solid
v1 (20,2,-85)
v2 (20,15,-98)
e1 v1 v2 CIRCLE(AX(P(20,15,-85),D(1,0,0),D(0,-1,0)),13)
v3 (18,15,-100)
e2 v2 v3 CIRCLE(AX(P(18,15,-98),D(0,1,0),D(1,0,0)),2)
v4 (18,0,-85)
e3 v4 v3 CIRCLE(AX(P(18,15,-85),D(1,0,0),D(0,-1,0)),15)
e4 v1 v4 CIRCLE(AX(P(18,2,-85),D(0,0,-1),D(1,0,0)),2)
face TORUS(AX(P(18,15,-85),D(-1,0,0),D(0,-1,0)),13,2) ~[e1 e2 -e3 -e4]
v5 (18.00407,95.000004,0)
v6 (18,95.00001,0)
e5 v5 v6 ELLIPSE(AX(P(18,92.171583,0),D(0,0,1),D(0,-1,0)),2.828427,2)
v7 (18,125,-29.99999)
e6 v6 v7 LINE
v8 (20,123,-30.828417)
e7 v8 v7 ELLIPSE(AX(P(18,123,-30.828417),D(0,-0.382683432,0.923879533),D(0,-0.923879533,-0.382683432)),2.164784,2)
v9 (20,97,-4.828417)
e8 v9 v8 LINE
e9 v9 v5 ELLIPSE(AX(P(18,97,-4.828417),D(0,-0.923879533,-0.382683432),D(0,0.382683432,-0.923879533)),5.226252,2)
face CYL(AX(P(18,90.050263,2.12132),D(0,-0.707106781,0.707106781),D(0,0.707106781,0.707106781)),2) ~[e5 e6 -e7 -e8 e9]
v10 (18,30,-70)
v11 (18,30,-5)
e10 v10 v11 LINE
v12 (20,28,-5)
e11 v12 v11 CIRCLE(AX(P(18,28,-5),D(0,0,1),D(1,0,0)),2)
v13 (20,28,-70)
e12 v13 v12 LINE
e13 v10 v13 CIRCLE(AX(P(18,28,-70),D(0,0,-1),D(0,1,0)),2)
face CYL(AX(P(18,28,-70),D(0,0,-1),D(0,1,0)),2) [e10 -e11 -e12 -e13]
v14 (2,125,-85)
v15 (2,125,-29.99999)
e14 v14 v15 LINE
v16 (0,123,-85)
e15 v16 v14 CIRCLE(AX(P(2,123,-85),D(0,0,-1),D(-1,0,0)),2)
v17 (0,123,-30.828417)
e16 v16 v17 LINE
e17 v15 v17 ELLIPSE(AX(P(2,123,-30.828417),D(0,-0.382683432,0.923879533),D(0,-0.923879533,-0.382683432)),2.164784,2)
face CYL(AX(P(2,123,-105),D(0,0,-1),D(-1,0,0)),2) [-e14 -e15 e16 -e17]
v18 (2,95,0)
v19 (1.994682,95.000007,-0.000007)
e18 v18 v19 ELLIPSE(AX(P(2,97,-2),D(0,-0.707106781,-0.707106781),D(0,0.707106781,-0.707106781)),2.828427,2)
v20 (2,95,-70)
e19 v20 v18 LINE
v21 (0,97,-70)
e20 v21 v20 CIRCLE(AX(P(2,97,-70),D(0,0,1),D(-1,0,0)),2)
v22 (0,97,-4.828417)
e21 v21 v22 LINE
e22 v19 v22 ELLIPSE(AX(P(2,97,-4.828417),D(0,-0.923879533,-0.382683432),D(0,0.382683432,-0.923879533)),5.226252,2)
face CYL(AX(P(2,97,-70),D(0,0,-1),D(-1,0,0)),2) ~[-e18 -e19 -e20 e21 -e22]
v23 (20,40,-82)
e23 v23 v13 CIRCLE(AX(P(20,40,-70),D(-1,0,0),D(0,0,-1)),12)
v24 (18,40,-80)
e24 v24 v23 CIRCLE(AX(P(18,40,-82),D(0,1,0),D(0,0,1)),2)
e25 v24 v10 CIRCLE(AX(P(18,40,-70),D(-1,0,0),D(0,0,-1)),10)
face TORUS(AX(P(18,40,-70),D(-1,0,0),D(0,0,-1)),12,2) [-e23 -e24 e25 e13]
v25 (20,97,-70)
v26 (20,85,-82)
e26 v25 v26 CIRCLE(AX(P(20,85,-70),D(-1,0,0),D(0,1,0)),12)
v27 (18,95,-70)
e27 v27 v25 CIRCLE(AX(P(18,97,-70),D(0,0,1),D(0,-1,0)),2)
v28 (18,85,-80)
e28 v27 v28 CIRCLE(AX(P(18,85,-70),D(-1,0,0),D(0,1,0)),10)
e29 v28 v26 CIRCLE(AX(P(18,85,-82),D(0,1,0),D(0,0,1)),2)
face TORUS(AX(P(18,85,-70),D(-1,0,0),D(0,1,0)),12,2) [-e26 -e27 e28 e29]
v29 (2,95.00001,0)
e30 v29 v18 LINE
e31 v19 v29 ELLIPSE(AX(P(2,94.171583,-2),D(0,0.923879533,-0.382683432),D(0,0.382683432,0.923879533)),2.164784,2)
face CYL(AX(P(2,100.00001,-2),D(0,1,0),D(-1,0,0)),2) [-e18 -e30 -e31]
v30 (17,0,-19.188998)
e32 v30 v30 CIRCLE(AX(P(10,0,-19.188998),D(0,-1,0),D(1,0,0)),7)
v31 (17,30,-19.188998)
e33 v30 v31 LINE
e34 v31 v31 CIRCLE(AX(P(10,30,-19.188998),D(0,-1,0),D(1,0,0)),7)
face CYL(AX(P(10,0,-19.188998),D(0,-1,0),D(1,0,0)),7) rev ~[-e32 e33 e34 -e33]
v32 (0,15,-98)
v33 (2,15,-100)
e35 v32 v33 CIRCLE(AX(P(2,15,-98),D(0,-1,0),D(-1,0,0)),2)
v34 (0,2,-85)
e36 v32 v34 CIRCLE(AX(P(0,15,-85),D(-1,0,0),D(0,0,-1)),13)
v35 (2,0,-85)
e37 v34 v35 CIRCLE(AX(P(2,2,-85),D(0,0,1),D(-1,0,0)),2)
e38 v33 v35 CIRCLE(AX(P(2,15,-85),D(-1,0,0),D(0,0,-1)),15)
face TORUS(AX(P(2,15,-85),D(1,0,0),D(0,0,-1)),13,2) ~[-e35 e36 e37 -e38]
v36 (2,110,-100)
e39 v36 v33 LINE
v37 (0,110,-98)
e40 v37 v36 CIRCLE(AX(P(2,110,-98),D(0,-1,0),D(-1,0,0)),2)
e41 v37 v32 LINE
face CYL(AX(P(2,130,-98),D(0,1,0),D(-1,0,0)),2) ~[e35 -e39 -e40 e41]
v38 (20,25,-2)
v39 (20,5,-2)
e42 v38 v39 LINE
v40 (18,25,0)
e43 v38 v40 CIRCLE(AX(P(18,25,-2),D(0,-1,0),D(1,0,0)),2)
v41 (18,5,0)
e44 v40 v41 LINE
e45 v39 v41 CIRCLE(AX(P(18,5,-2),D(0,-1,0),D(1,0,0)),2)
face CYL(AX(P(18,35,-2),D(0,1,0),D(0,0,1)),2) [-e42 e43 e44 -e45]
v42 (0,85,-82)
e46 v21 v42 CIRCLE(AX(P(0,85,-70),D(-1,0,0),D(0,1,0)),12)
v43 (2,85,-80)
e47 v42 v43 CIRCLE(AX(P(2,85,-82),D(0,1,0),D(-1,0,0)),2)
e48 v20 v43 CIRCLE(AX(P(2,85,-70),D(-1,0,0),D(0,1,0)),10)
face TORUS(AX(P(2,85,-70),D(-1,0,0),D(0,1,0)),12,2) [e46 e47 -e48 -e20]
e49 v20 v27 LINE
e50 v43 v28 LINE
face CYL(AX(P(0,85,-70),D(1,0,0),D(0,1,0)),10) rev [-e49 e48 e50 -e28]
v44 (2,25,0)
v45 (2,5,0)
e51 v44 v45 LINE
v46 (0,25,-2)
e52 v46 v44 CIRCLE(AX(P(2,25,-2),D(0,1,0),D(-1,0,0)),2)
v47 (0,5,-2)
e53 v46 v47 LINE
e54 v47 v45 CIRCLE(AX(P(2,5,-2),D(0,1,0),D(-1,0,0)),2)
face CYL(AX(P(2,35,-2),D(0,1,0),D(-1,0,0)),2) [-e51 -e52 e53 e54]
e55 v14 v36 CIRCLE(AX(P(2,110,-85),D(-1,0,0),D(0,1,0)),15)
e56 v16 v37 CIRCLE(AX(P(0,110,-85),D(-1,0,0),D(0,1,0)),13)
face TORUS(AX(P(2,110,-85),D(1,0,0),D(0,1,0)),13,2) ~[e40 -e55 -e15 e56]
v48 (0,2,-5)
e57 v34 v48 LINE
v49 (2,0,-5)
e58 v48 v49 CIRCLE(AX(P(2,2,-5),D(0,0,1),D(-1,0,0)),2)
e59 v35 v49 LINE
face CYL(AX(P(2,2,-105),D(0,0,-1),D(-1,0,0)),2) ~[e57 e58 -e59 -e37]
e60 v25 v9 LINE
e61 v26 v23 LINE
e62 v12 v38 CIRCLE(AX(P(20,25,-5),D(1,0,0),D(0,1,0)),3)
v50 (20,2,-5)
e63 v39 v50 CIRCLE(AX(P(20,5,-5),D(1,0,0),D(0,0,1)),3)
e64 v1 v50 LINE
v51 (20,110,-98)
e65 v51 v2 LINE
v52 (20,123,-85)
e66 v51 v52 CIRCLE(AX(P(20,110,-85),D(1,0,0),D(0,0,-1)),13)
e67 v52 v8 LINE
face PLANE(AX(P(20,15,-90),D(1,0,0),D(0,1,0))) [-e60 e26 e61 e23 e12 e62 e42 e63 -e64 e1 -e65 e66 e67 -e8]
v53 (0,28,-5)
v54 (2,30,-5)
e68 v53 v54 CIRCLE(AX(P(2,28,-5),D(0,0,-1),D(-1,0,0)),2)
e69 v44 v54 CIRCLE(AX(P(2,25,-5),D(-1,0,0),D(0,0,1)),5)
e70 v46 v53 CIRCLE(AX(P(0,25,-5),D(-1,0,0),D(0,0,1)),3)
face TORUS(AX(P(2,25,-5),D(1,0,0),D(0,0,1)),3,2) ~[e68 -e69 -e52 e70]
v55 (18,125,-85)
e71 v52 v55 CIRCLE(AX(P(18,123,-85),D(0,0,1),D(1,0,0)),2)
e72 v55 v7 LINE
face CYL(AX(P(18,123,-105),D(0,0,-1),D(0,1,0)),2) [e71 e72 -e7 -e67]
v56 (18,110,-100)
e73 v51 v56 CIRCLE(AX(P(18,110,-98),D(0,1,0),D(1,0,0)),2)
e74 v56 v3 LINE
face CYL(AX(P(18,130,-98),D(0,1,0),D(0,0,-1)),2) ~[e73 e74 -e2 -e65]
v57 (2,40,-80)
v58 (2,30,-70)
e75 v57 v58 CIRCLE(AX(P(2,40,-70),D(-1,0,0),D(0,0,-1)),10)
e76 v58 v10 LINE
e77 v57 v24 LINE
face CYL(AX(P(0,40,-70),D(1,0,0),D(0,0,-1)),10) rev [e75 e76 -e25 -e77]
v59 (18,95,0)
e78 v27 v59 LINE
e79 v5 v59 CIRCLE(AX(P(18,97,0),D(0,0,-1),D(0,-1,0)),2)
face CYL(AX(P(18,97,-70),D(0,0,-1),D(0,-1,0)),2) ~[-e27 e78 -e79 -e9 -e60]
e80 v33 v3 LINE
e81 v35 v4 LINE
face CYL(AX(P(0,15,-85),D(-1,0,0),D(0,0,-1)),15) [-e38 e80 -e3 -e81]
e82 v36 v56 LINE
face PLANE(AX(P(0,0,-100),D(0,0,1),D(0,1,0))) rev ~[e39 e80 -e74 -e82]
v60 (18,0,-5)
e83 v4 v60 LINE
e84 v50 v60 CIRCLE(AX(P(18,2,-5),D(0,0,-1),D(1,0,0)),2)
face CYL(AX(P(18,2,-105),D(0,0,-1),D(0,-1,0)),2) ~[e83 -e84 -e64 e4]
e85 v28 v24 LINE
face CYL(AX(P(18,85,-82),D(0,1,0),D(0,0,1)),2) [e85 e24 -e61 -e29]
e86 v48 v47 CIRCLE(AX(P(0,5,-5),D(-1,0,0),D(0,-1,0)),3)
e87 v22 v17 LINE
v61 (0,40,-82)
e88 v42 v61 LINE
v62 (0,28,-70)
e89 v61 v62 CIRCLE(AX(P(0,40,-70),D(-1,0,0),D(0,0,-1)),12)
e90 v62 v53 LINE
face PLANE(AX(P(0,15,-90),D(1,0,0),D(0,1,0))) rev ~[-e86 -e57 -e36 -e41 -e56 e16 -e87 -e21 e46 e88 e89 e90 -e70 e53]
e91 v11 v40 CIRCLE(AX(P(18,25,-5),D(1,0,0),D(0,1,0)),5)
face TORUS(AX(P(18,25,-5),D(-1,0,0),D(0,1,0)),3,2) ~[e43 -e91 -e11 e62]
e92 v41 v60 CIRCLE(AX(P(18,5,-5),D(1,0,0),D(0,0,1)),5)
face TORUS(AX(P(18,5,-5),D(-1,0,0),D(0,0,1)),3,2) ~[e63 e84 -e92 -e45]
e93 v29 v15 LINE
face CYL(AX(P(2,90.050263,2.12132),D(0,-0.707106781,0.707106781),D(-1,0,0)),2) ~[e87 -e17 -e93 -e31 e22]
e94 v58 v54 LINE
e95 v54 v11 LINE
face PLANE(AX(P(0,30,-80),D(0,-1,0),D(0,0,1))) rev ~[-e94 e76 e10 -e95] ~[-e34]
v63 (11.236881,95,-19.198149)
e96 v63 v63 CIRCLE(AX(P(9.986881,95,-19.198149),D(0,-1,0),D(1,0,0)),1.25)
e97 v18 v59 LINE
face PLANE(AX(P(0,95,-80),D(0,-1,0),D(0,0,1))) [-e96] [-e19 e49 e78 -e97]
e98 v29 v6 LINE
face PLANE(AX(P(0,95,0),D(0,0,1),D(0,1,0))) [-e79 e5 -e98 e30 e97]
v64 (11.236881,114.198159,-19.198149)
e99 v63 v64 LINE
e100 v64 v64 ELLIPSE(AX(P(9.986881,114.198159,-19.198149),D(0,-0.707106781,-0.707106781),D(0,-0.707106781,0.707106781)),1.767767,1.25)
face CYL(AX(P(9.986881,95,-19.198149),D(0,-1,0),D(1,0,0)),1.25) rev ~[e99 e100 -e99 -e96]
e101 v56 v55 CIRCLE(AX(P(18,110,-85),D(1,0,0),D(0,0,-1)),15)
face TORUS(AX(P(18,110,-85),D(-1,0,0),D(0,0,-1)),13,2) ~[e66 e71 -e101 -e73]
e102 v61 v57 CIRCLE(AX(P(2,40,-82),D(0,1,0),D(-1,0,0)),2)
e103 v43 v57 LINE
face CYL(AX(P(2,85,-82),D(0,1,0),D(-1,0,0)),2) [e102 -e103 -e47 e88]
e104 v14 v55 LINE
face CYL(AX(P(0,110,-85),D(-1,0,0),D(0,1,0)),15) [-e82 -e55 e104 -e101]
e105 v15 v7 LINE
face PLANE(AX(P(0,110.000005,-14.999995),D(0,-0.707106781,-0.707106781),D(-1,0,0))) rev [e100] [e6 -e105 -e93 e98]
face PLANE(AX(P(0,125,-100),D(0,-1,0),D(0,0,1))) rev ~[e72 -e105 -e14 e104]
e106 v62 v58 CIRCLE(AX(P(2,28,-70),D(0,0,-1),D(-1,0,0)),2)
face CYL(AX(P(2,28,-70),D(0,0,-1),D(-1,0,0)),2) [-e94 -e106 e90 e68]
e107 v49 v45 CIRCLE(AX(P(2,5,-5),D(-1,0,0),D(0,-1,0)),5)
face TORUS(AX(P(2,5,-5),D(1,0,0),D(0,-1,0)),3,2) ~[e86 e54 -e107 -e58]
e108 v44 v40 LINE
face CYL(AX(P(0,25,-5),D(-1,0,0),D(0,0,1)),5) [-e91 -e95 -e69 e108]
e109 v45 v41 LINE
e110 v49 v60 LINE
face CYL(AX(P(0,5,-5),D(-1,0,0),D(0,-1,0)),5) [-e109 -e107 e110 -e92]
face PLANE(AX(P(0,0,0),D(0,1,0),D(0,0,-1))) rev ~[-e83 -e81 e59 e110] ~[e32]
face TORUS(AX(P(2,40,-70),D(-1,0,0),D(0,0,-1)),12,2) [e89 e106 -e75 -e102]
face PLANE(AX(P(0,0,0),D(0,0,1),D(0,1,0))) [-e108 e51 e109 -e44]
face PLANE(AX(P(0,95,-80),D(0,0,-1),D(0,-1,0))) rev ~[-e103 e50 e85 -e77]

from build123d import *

# Parameters (mm, degrees)
F0_W         = 30
F0_H         = 20
F0_W_2       = 65
F0_H_2       = 80
F1_DEPTH     = 20
F2_R         = 10
F3_SIZE      = 29.99999
F4_T1_DEPTH  = 75
F4_T3_DEPTH  = 52.4263927291
F4_T5_DEPTH  = 80.00001
F4_T7_DEPTH  = 135
F4_T9_DEPTH  = 110
F4_T11_DEPTH = 40
F4_T13_DEPTH = 45
F4_T16_ANGLE = 90
F4_T18_ANGLE = 90
F5_T1_DEPTH  = 40
F5_T3_DEPTH  = 110
F5_T5_DEPTH  = 75
F5_T7_DEPTH  = 45
F5_T9_DEPTH  = 10.00001
F5_T11_DEPTH = 52.4263927291
F5_T13_DEPTH = 80.00001
F5_T15_DEPTH = 135
F5_T18_ANGLE = 90
F5_T20_ANGLE = 90
F6_T1_DEPTH  = 19.9999999998
F6_T4_ANGLE  = 90
F6_T6_ANGLE  = 90
F7_T1_DEPTH  = 19.9999999998
F7_T4_ANGLE  = 90
F7_T6_ANGLE  = 90
F7_T8_ANGLE  = 90
F7_T10_ANGLE = 90
F8_R         = 7
F9_DEPTH     = 52.5
F10_T1_DEPTH = 19.9999999998
F10_T4_ANGLE = 90
F10_T6_ANGLE = 90
F11_R        = 1.25
F12_DEPTH    = 53


# Not quite as in the source:
# - a fillet or chamfer that OpenCascade refuses, or shapes differently, is made with other operations: its cross-section is extruded or revolved along the edge and cut away or added
# - a fillet or chamfer is up to 0.001 mm smaller than in the source, because OpenCascade refuses the exact size


with BuildPart() as f1:
    # F0 (on Right) → F1 (new body)
    with BuildSketch(Plane.YZ):
        with Locations((15, -90)):
            Rectangle(F0_W, F0_H)
        with Locations((62.5, -90)):
            Rectangle(F0_W_2, F0_H)
        with Locations((15, -40)):
            Rectangle(F0_W, F0_H_2)
        with Locations((110, -90)):
            Rectangle(F0_W, F0_H)
        with Locations((110, -40)):
            Rectangle(F0_W, F0_H_2)
    extrude(amount=F1_DEPTH)

    # F2
    f2_edges = [f1.edges().sort_by_distance(p)[0] for p in [
        (10, 95, -80),
        (10, 30, -80),
    ]]
    fillet(f2_edges, radius=F2_R)

    # F3 (size 30 in the source; OpenCascade refuses exactly that, so slightly less here)
    f3_edges = [f1.edges().sort_by_distance(p)[0] for p in [
        (10, 125, 0),
    ]]
    chamfer(f3_edges, length=F3_SIZE)

    # F4: fillet of radius 2 on 10 edges, made by hand

    # F4_s2 → F4_t1 (cut)
    with BuildSketch(Plane.XY.offset(-70)):
        with BuildLine():
            ThreePointArc((18, 95), (19.4142135624, 95.5857864376), (20, 97))
            Line((20, 97), (20, 95))
            Line((20, 95), (18, 95))
        make_face()
        with BuildLine():
            ThreePointArc((18, 30), (19.4142135624, 29.4142135624), (20, 28))
            Line((20, 28), (20, 30))
            Line((20, 30), (18, 30))
        make_face()
    extrude(amount=F4_T1_DEPTH, mode=Mode.SUBTRACT)

    # F4_s4 → F4_t3 (cut)
    with BuildSketch(Plane(origin=(0, 43.9644710941, -43.9644710941), x_dir=(1, 0, 0), z_dir=(0, 0.7071067812, -0.7071067812))):
        with BuildLine():
            ThreePointArc((18, -67.1751512838), (19.4142135624, -66.5893648462), (20, -65.1751512838))
            Line((20, -65.1751512838), (20, -67.1751512838))
            Line((20, -67.1751512838), (18, -67.1751512838))
        make_face()
    extrude(amount=F4_T3_DEPTH, mode=Mode.SUBTRACT)

    # F4_s6 → F4_t5 (cut)
    with BuildSketch(Plane.XY.offset(-105)):
        with BuildLine():
            ThreePointArc((18, 125), (19.4142135624, 124.4142135624), (20, 123))
            Line((20, 123), (20, 125))
            Line((20, 125), (18, 125))
        make_face()
    extrude(amount=F4_T5_DEPTH, mode=Mode.SUBTRACT)

    # F4_s8 → F4_t7 (cut)
    with BuildSketch(Plane.XZ.offset(-130)):
        with BuildLine():
            ThreePointArc((18, -100), (19.4142135624, -99.4142135624), (20, -98))
            Line((20, -98), (20, -100))
            Line((20, -100), (18, -100))
        make_face()
    extrude(amount=F4_T7_DEPTH, mode=Mode.SUBTRACT)

    # F4_s10 → F4_t9 (cut)
    with BuildSketch(Plane.XY.offset(-105)):
        with BuildLine():
            ThreePointArc((18, 0), (19.4142135624, 0.5857864376), (20, 2))
            Line((20, 2), (20, 0))
            Line((20, 0), (18, 0))
        make_face()
    extrude(amount=F4_T9_DEPTH, mode=Mode.SUBTRACT)

    # F4_s12 → F4_t11 (cut)
    with BuildSketch(Plane.XZ.offset(-35)):
        with BuildLine():
            ThreePointArc((18, 0), (19.4142135624, -0.5857864376), (20, -2))
            Line((20, -2), (20, 0))
            Line((20, 0), (18, 0))
        make_face()
    extrude(amount=F4_T11_DEPTH, mode=Mode.SUBTRACT)

    # F4_s14 → F4_t13 (cut)
    with BuildSketch(Plane.XZ.offset(-85)):
        with BuildLine():
            ThreePointArc((18, -80), (19.4142135624, -80.5857864376), (20, -82))
            Line((20, -82), (20, -80))
            Line((20, -80), (18, -80))
        make_face()
    extrude(amount=F4_T13_DEPTH, mode=Mode.SUBTRACT)

    # F4_s15 → F4_t16 (revolve, cut)
    with BuildSketch(Plane.XY.offset(-70)):
        with BuildLine():
            ThreePointArc((18, 95), (19.4142135624, 95.5857864376), (20, 97))
            Line((20, 97), (20, 95))
            Line((20, 95), (18, 95))
        make_face()
    revolve(axis=Axis((20, 85, -70), (-1, 0, 0)), revolution_arc=F4_T16_ANGLE, mode=Mode.SUBTRACT)

    # F4_s17 → F4_t18 (revolve, cut)
    with BuildSketch(Plane.XZ.offset(-40)):
        with BuildLine():
            ThreePointArc((18, -80), (19.4142135624, -80.5857864376), (20, -82))
            Line((20, -82), (20, -80))
            Line((20, -80), (18, -80))
        make_face()
    revolve(axis=Axis((20, 40, -70), (-1, 0, 0)), revolution_arc=F4_T18_ANGLE, mode=Mode.SUBTRACT)

    # F5: fillet of radius 2 on 11 edges, made by hand

    # F5_s2 → F5_t1 (cut)
    with BuildSketch(Plane.XZ.offset(-35)):
        with BuildLine():
            ThreePointArc((0, -2), (0.5857864376, -0.5857864376), (2, 0))
            Line((2, 0), (0, 0))
            Line((0, 0), (0, -2))
        make_face()
    extrude(amount=F5_T1_DEPTH, mode=Mode.SUBTRACT)

    # F5_s4 → F5_t3 (cut)
    with BuildSketch(Plane.XY.offset(-105)):
        with BuildLine():
            ThreePointArc((0, 2), (0.5857864376, 0.5857864376), (2, 0))
            Line((2, 0), (0, 0))
            Line((0, 0), (0, 2))
        make_face()
    extrude(amount=F5_T3_DEPTH, mode=Mode.SUBTRACT)

    # F5_s6 → F5_t5 (cut)
    with BuildSketch(Plane.XY.offset(-70)):
        with BuildLine():
            ThreePointArc((0, 28), (0.5857864376, 29.4142135624), (2, 30))
            Line((2, 30), (0, 30))
            Line((0, 30), (0, 28))
        make_face()
        with BuildLine():
            ThreePointArc((0, 97), (0.5857864376, 95.5857864376), (2, 95))
            Line((2, 95), (0, 95))
            Line((0, 95), (0, 97))
        make_face()
    extrude(amount=F5_T5_DEPTH, mode=Mode.SUBTRACT)

    # F5_s8 → F5_t7 (cut)
    with BuildSketch(Plane.XZ.offset(-85)):
        with BuildLine():
            ThreePointArc((0, -82), (0.5857864376, -80.5857864376), (2, -80))
            Line((2, -80), (0, -80))
            Line((0, -80), (0, -82))
        make_face()
    extrude(amount=F5_T7_DEPTH, mode=Mode.SUBTRACT)

    # F5_s10 → F5_t9 (cut)
    with BuildSketch(Plane.XZ.offset(-100.00001)):
        with BuildLine():
            ThreePointArc((0, -2), (0.5857864376, -0.5857864376), (2, 0))
            Line((2, 0), (0, 0))
            Line((0, 0), (0, -2))
        make_face()
    extrude(amount=F5_T9_DEPTH, mode=Mode.SUBTRACT)

    # F5_s12 → F5_t11 (cut)
    with BuildSketch(Plane(origin=(0, 43.9644710941, -43.9644710941), x_dir=(1, 0, 0), z_dir=(0, 0.7071067812, -0.7071067812))):
        with BuildLine():
            ThreePointArc((0, -65.1751512838), (0.5857864376, -66.5893648462), (2, -67.1751512838))
            Line((2, -67.1751512838), (0, -67.1751512838))
            Line((0, -67.1751512838), (0, -65.1751512838))
        make_face()
    extrude(amount=F5_T11_DEPTH, mode=Mode.SUBTRACT)

    # F5_s14 → F5_t13 (cut)
    with BuildSketch(Plane.XY.offset(-105)):
        with BuildLine():
            ThreePointArc((0, 123), (0.5857864376, 124.4142135624), (2, 125))
            Line((2, 125), (0, 125))
            Line((0, 125), (0, 123))
        make_face()
    extrude(amount=F5_T13_DEPTH, mode=Mode.SUBTRACT)

    # F5_s16 → F5_t15 (cut)
    with BuildSketch(Plane.XZ.offset(-130)):
        with BuildLine():
            ThreePointArc((0, -98), (0.5857864376, -99.4142135624), (2, -100))
            Line((2, -100), (0, -100))
            Line((0, -100), (0, -98))
        make_face()
    extrude(amount=F5_T15_DEPTH, mode=Mode.SUBTRACT)

    # F5_s17 → F5_t18 (revolve, cut)
    with BuildSketch(Plane.XZ.offset(-40)):
        with BuildLine():
            ThreePointArc((0, -82), (0.5857864376, -80.5857864376), (2, -80))
            Line((2, -80), (0, -80))
            Line((0, -80), (0, -82))
        make_face()
    revolve(axis=Axis((0, 40, -70), (-1, 0, 0)), revolution_arc=F5_T18_ANGLE, mode=Mode.SUBTRACT)

    # F5_s19 → F5_t20 (revolve, cut)
    with BuildSketch(Plane.XY.offset(-70)):
        with BuildLine():
            ThreePointArc((0, 97), (0.5857864376, 95.5857864376), (2, 95))
            Line((2, 95), (0, 95))
            Line((0, 95), (0, 97))
        make_face()
    revolve(axis=Axis((0, 85, -70), (-1, 0, 0)), revolution_arc=F5_T20_ANGLE, mode=Mode.SUBTRACT)

    # F6: fillet of radius 5 on 1 edges, made by hand

    # F6_s2 → F6_t1 (cut)
    with BuildSketch(Plane.YZ):
        with BuildLine():
            ThreePointArc((0, -5), (1.4644660941, -1.4644660941), (5, 0))
            Line((5, 0), (0, 0))
            Line((0, 0), (0, -5))
        make_face()
    extrude(amount=F6_T1_DEPTH, mode=Mode.SUBTRACT)

    # F6_s3 → F6_t4 (revolve, cut)
    with BuildSketch(Plane.XY.offset(-5)):
        with BuildLine():
            ThreePointArc((0, 1.9999999999), (0.5857864376, 0.5857864376), (1.9999999999, 0))
            Line((1.9999999999, 0), (0, 0))
            Line((0, 0), (0, 1.9999999999))
        make_face()
    revolve(axis=Axis((0, 5, -5), (-1, 0, 0)), revolution_arc=F6_T4_ANGLE, mode=Mode.SUBTRACT)

    # F6_s5 → F6_t6 (revolve, cut)
    with BuildSketch(Plane.XZ.offset(-5)):
        with BuildLine():
            ThreePointArc((20, -1.9999999999), (19.4142135624, -0.5857864376), (18.0000000001, 0))
            Line((18.0000000001, 0), (20, 0))
            Line((20, 0), (20, -1.9999999999))
        make_face()
    revolve(axis=Axis((20, 5, -5), (1, 0, 0)), revolution_arc=F6_T6_ANGLE, mode=Mode.SUBTRACT)

    # F7: fillet of radius 15 on 2 edges, made by hand

    # F7_s2 → F7_t1 (cut)
    with BuildSketch(Plane.YZ):
        with BuildLine():
            ThreePointArc((15, -100), (4.3933982822, -95.6066017178), (0, -85))
            Line((0, -85), (0, -100))
            Line((0, -100), (15, -100))
        make_face()
        with BuildLine():
            ThreePointArc((125, -85), (120.6066017178, -95.6066017178), (110, -100))
            Line((110, -100), (125, -100))
            Line((125, -100), (125, -85))
        make_face()
    extrude(amount=F7_T1_DEPTH, mode=Mode.SUBTRACT)

    # F7_s3 → F7_t4 (revolve, cut)
    with BuildSketch(Plane.XY.offset(-85)):
        with BuildLine():
            ThreePointArc((0, 123.0000000001), (0.5857864376, 124.4142135624), (1.9999999999, 125))
            Line((1.9999999999, 125), (0, 125))
            Line((0, 125), (0, 123.0000000001))
        make_face()
    revolve(axis=Axis((0, 110, -85), (-1, 0, 0)), revolution_arc=F7_T4_ANGLE, mode=Mode.SUBTRACT)

    # F7_s5 → F7_t6 (revolve, cut)
    with BuildSketch(Plane.XZ.offset(-110)):
        with BuildLine():
            ThreePointArc((20, -98.0000000001), (19.4142135624, -99.4142135624), (18.0000000001, -100))
            Line((18.0000000001, -100), (20, -100))
            Line((20, -100), (20, -98.0000000001))
        make_face()
    revolve(axis=Axis((20, 110, -85), (1, 0, 0)), revolution_arc=F7_T6_ANGLE, mode=Mode.SUBTRACT)

    # F7_s7 → F7_t8 (revolve, cut)
    with BuildSketch(Plane.XZ.offset(-15)):
        with BuildLine():
            ThreePointArc((0, -98.0000000001), (0.5857864376, -99.4142135624), (1.9999999999, -100))
            Line((1.9999999999, -100), (0, -100))
            Line((0, -100), (0, -98.0000000001))
        make_face()
    revolve(axis=Axis((0, 15, -85), (-1, 0, 0)), revolution_arc=F7_T8_ANGLE, mode=Mode.SUBTRACT)

    # F7_s9 → F7_t10 (revolve, cut)
    with BuildSketch(Plane.XY.offset(-85)):
        with BuildLine():
            ThreePointArc((20, 1.9999999999), (19.4142135624, 0.5857864376), (18.0000000001, 0))
            Line((18.0000000001, 0), (20, 0))
            Line((20, 0), (20, 1.9999999999))
        make_face()
    revolve(axis=Axis((20, 15, -85), (1, 0, 0)), revolution_arc=F7_T10_ANGLE, mode=Mode.SUBTRACT)

    # F8 (on face) → F9 (cut)
    with BuildSketch(Plane.XZ):
        with Locations((10, -19.1889982671)):
            Circle(F8_R)
    extrude(amount=-F9_DEPTH, mode=Mode.SUBTRACT)

    # F10: fillet of radius 5 on 1 edges, made by hand

    # F10_s2 → F10_t1 (cut)
    with BuildSketch(Plane.YZ):
        with BuildLine():
            ThreePointArc((25, 0), (28.5355339059, -1.4644660941), (30, -5))
            Line((30, -5), (30, 0))
            Line((30, 0), (25, 0))
        make_face()
    extrude(amount=F10_T1_DEPTH, mode=Mode.SUBTRACT)

    # F10_s3 → F10_t4 (revolve, cut)
    with BuildSketch(Plane.XZ.offset(-25)):
        with BuildLine():
            ThreePointArc((0, -1.9999999999), (0.5857864376, -0.5857864376), (1.9999999999, 0))
            Line((1.9999999999, 0), (0, 0))
            Line((0, 0), (0, -1.9999999999))
        make_face()
    revolve(axis=Axis((0, 25, -5), (-1, 0, 0)), revolution_arc=F10_T4_ANGLE, mode=Mode.SUBTRACT)

    # F10_s5 → F10_t6 (revolve, cut)
    with BuildSketch(Plane.XY.offset(-5)):
        with BuildLine():
            ThreePointArc((20, 28.0000000001), (19.4142135624, 29.4142135624), (18.0000000001, 30))
            Line((18.0000000001, 30), (20, 30))
            Line((20, 30), (20, 28.0000000001))
        make_face()
    revolve(axis=Axis((20, 25, -5), (1, 0, 0)), revolution_arc=F10_T6_ANGLE, mode=Mode.SUBTRACT)

    # F11 (on face) → F12 (cut)
    with BuildSketch(Plane.XZ.offset(-95)):
        with Locations((9.9868811667, -19.1981494427)):
            Circle(F11_R)
    extrude(amount=-F12_DEPTH, mode=Mode.SUBTRACT)


solid = f1.part
